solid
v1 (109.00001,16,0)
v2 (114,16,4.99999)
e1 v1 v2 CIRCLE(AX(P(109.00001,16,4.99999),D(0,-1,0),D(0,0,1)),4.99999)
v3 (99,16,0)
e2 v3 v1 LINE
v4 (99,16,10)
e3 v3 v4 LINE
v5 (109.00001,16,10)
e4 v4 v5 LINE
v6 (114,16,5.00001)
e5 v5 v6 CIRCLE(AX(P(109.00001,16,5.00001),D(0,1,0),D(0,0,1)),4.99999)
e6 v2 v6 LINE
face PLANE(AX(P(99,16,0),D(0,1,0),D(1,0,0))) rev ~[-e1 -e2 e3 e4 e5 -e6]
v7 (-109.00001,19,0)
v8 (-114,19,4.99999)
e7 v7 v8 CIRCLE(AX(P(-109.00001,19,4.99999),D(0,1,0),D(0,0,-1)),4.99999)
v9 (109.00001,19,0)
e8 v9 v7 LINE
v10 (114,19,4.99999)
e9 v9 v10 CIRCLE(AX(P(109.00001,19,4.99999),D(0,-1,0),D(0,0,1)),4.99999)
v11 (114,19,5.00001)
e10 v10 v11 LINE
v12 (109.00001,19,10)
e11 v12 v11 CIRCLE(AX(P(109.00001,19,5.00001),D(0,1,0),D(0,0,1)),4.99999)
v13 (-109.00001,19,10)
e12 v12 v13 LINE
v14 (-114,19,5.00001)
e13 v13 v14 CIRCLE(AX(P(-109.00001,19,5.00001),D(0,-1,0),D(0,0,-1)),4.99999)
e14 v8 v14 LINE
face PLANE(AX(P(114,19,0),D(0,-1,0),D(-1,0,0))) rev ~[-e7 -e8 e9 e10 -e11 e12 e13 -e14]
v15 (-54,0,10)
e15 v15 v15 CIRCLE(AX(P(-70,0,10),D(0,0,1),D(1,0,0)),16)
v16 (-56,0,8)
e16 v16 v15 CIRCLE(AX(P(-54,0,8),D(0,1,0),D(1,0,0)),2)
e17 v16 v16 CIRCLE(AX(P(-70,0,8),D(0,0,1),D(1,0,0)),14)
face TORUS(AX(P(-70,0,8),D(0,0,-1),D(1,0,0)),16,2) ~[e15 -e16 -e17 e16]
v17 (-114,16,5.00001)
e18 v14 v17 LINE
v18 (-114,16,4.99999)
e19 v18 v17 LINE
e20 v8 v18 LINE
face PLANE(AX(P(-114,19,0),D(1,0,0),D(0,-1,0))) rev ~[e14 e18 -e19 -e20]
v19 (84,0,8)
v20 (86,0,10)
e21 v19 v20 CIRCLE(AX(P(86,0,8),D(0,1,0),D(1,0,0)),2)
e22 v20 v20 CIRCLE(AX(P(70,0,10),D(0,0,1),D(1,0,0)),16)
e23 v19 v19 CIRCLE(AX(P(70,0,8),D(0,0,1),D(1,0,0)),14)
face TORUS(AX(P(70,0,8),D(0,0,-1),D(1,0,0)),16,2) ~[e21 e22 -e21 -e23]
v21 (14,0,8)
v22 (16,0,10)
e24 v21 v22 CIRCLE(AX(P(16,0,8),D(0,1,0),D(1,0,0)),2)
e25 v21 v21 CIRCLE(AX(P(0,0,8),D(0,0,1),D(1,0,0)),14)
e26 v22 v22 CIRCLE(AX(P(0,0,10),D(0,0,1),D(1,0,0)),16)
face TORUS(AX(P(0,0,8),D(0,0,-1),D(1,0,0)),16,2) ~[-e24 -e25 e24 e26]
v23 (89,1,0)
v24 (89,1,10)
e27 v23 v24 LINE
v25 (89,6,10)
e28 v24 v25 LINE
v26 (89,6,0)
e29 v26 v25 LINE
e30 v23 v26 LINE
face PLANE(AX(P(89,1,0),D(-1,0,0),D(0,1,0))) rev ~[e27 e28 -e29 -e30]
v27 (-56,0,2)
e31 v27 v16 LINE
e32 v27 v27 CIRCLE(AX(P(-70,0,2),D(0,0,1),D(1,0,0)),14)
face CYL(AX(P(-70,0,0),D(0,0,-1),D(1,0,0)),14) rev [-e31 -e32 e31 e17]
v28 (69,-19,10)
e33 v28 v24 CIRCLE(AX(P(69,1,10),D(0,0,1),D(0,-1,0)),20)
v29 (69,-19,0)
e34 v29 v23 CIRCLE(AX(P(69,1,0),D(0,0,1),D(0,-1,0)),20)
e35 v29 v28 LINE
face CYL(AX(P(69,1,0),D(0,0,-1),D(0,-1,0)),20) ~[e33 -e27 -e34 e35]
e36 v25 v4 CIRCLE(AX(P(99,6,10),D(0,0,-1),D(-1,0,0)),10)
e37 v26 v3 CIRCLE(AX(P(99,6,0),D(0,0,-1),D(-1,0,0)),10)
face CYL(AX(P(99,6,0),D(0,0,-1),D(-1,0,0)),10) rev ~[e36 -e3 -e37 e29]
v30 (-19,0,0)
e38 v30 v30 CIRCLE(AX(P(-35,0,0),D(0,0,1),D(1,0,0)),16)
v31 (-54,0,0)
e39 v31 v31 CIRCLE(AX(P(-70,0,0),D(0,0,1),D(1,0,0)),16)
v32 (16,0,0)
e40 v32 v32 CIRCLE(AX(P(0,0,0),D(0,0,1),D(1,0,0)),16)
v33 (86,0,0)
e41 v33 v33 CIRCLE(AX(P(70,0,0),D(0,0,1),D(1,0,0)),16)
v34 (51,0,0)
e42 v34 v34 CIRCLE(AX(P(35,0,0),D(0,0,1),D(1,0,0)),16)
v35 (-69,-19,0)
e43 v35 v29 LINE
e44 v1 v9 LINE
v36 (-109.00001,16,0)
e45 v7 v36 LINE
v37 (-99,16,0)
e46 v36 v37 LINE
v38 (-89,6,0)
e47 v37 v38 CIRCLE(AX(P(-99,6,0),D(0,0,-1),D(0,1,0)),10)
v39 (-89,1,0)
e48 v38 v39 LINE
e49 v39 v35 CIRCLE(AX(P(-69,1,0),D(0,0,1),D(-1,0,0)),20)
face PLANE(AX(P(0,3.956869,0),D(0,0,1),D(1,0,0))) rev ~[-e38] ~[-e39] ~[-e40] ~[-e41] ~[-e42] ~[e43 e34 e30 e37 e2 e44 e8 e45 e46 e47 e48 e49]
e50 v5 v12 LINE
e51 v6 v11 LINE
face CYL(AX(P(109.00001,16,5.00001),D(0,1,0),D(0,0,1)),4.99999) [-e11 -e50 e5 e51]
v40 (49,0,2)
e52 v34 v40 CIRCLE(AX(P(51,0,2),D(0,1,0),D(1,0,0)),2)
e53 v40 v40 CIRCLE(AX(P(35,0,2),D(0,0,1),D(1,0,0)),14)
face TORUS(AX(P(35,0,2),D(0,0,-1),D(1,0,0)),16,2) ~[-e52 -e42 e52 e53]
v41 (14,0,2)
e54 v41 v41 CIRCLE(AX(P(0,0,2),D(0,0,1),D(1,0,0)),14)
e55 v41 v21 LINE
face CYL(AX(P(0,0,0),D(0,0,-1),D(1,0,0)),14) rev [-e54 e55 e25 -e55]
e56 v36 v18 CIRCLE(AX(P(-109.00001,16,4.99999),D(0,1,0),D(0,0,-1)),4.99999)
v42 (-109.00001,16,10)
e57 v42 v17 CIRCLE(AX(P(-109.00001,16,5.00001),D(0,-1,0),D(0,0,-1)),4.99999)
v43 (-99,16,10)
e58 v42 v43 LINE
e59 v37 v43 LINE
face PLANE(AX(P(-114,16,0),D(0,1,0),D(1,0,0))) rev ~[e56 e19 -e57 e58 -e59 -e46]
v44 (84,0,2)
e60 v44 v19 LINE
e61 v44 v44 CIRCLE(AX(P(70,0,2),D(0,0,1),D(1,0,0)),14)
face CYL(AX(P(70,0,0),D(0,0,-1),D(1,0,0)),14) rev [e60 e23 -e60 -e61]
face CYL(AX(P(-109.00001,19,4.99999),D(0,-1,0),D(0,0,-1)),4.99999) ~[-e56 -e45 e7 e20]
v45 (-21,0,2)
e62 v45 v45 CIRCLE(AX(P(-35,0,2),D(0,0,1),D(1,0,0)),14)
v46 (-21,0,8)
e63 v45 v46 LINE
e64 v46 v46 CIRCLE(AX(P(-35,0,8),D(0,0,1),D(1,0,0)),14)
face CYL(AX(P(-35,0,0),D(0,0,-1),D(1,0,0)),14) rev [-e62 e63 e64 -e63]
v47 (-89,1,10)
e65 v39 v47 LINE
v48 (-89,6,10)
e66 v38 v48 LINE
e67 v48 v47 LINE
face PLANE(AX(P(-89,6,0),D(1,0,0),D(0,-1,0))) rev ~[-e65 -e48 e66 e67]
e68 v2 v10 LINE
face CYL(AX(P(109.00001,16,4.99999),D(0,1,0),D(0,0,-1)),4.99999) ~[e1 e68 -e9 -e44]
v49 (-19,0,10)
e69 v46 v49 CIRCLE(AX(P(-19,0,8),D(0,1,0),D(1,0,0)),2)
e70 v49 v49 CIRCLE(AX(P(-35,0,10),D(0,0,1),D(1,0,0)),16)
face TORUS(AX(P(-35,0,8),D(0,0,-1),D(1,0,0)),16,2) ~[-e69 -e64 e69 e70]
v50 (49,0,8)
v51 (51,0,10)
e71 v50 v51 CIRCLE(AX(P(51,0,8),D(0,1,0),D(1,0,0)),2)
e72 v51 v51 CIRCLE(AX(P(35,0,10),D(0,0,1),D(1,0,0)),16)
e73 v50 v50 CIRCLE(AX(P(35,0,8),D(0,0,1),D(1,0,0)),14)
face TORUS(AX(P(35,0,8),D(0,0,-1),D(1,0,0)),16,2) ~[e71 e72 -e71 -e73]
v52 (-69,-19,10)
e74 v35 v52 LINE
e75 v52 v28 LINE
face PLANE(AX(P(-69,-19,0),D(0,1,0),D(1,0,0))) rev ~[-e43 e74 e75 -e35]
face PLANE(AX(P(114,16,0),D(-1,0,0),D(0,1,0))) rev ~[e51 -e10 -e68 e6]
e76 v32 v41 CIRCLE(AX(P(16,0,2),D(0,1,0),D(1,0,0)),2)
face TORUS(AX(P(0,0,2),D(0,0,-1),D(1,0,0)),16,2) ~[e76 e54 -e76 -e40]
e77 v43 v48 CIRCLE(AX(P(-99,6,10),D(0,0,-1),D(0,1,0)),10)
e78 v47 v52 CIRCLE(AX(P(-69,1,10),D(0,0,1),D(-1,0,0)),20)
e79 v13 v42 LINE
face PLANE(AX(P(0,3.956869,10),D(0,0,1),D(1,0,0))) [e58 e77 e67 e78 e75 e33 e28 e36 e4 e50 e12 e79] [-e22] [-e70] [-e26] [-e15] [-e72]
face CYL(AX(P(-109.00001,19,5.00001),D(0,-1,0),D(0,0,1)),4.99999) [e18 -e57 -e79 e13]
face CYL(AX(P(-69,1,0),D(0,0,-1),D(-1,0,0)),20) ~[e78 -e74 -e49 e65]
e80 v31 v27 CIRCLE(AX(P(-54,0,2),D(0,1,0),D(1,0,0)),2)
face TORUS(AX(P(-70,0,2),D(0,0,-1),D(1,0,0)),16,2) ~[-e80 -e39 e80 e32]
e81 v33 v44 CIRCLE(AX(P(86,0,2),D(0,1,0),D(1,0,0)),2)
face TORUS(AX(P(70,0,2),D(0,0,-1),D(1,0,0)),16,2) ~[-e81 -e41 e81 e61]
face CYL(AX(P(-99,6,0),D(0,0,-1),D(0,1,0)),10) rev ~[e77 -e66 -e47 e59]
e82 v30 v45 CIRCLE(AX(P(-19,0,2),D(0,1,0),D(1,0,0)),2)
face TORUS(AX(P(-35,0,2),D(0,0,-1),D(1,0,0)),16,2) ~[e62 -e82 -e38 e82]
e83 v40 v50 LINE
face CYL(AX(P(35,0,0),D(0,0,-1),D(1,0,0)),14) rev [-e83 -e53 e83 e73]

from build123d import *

# Parameters (mm, degrees)
F0_R     = 14
F1_DEPTH = 10
F2_R     = 2
F3_R     = 4.99999
F4_R     = 2


# Not quite as in the source:
# - a fillet or chamfer is up to 0.001 mm smaller than in the source, because OpenCascade refuses the exact size


with BuildPart() as f1:
    # F0 (on Top) → F1 (new body)
    with BuildSketch(Plane.XY):
        with BuildLine():
            Line((89, 19), (-89, 19))
            Line((-89, 19), (-114, 19))
            Line((-114, 19), (-114, 16))
            Line((-114, 16), (-99, 16))
            ThreePointArc((-99, 16), (-91.9289321881, 13.0710678119), (-89, 6))
            Line((-89, 6), (-89, 1))
            ThreePointArc((-89, 1), (-83.1421356237, -13.1421356237), (-69, -19))
            Line((-69, -19), (69, -19))
            ThreePointArc((69, -19), (83.1421356237, -13.1421356237), (89, 1))
            Line((89, 1), (89, 6))
            ThreePointArc((89, 6), (91.9289321881, 13.0710678119), (99, 16))
            Line((99, 16), (114, 16))
            Line((114, 16), (114, 19))
            Line((114, 19), (89, 19))
        make_face()
        with Locations((-70, 0)):
            Circle(F0_R, mode=Mode.SUBTRACT)
        with Locations((-35, 0)):
            Circle(F0_R, mode=Mode.SUBTRACT)
        Circle(F0_R, mode=Mode.SUBTRACT)
        with Locations((35, 0)):
            Circle(F0_R, mode=Mode.SUBTRACT)
        with Locations((70, 0)):
            Circle(F0_R, mode=Mode.SUBTRACT)
    extrude(amount=F1_DEPTH)

    # F2
    f2_edges = [f1.edges().sort_by_distance(p)[0] for p in [
        (-84, 0, 10),
        (-49, 0, 10),
        (-14, 0, 10),
        (21, 0, 10),
        (56, 0, 10),
    ]]
    fillet(f2_edges, radius=F2_R)

    # F3 (radius 5 in the source; OpenCascade refuses exactly that, so slightly less here)
    f3_edges = [f1.edges().sort_by_distance(p)[0] for p in [
        (-114, 17.5, 10),
        (-114, 17.5, 0),
        (114, 17.5, 10),
        (114, 17.5, 0),
    ]]
    fillet(f3_edges, radius=F3_R)

    # F4
    f4_edges = [f1.edges().sort_by_distance(p)[0] for p in [
        (56, 0, 0),
        (21, 0, 0),
        (-14, 0, 0),
        (-49, 0, 0),
        (-84, 0, 0),
    ]]
    fillet(f4_edges, radius=F4_R)


solid = f1.part
